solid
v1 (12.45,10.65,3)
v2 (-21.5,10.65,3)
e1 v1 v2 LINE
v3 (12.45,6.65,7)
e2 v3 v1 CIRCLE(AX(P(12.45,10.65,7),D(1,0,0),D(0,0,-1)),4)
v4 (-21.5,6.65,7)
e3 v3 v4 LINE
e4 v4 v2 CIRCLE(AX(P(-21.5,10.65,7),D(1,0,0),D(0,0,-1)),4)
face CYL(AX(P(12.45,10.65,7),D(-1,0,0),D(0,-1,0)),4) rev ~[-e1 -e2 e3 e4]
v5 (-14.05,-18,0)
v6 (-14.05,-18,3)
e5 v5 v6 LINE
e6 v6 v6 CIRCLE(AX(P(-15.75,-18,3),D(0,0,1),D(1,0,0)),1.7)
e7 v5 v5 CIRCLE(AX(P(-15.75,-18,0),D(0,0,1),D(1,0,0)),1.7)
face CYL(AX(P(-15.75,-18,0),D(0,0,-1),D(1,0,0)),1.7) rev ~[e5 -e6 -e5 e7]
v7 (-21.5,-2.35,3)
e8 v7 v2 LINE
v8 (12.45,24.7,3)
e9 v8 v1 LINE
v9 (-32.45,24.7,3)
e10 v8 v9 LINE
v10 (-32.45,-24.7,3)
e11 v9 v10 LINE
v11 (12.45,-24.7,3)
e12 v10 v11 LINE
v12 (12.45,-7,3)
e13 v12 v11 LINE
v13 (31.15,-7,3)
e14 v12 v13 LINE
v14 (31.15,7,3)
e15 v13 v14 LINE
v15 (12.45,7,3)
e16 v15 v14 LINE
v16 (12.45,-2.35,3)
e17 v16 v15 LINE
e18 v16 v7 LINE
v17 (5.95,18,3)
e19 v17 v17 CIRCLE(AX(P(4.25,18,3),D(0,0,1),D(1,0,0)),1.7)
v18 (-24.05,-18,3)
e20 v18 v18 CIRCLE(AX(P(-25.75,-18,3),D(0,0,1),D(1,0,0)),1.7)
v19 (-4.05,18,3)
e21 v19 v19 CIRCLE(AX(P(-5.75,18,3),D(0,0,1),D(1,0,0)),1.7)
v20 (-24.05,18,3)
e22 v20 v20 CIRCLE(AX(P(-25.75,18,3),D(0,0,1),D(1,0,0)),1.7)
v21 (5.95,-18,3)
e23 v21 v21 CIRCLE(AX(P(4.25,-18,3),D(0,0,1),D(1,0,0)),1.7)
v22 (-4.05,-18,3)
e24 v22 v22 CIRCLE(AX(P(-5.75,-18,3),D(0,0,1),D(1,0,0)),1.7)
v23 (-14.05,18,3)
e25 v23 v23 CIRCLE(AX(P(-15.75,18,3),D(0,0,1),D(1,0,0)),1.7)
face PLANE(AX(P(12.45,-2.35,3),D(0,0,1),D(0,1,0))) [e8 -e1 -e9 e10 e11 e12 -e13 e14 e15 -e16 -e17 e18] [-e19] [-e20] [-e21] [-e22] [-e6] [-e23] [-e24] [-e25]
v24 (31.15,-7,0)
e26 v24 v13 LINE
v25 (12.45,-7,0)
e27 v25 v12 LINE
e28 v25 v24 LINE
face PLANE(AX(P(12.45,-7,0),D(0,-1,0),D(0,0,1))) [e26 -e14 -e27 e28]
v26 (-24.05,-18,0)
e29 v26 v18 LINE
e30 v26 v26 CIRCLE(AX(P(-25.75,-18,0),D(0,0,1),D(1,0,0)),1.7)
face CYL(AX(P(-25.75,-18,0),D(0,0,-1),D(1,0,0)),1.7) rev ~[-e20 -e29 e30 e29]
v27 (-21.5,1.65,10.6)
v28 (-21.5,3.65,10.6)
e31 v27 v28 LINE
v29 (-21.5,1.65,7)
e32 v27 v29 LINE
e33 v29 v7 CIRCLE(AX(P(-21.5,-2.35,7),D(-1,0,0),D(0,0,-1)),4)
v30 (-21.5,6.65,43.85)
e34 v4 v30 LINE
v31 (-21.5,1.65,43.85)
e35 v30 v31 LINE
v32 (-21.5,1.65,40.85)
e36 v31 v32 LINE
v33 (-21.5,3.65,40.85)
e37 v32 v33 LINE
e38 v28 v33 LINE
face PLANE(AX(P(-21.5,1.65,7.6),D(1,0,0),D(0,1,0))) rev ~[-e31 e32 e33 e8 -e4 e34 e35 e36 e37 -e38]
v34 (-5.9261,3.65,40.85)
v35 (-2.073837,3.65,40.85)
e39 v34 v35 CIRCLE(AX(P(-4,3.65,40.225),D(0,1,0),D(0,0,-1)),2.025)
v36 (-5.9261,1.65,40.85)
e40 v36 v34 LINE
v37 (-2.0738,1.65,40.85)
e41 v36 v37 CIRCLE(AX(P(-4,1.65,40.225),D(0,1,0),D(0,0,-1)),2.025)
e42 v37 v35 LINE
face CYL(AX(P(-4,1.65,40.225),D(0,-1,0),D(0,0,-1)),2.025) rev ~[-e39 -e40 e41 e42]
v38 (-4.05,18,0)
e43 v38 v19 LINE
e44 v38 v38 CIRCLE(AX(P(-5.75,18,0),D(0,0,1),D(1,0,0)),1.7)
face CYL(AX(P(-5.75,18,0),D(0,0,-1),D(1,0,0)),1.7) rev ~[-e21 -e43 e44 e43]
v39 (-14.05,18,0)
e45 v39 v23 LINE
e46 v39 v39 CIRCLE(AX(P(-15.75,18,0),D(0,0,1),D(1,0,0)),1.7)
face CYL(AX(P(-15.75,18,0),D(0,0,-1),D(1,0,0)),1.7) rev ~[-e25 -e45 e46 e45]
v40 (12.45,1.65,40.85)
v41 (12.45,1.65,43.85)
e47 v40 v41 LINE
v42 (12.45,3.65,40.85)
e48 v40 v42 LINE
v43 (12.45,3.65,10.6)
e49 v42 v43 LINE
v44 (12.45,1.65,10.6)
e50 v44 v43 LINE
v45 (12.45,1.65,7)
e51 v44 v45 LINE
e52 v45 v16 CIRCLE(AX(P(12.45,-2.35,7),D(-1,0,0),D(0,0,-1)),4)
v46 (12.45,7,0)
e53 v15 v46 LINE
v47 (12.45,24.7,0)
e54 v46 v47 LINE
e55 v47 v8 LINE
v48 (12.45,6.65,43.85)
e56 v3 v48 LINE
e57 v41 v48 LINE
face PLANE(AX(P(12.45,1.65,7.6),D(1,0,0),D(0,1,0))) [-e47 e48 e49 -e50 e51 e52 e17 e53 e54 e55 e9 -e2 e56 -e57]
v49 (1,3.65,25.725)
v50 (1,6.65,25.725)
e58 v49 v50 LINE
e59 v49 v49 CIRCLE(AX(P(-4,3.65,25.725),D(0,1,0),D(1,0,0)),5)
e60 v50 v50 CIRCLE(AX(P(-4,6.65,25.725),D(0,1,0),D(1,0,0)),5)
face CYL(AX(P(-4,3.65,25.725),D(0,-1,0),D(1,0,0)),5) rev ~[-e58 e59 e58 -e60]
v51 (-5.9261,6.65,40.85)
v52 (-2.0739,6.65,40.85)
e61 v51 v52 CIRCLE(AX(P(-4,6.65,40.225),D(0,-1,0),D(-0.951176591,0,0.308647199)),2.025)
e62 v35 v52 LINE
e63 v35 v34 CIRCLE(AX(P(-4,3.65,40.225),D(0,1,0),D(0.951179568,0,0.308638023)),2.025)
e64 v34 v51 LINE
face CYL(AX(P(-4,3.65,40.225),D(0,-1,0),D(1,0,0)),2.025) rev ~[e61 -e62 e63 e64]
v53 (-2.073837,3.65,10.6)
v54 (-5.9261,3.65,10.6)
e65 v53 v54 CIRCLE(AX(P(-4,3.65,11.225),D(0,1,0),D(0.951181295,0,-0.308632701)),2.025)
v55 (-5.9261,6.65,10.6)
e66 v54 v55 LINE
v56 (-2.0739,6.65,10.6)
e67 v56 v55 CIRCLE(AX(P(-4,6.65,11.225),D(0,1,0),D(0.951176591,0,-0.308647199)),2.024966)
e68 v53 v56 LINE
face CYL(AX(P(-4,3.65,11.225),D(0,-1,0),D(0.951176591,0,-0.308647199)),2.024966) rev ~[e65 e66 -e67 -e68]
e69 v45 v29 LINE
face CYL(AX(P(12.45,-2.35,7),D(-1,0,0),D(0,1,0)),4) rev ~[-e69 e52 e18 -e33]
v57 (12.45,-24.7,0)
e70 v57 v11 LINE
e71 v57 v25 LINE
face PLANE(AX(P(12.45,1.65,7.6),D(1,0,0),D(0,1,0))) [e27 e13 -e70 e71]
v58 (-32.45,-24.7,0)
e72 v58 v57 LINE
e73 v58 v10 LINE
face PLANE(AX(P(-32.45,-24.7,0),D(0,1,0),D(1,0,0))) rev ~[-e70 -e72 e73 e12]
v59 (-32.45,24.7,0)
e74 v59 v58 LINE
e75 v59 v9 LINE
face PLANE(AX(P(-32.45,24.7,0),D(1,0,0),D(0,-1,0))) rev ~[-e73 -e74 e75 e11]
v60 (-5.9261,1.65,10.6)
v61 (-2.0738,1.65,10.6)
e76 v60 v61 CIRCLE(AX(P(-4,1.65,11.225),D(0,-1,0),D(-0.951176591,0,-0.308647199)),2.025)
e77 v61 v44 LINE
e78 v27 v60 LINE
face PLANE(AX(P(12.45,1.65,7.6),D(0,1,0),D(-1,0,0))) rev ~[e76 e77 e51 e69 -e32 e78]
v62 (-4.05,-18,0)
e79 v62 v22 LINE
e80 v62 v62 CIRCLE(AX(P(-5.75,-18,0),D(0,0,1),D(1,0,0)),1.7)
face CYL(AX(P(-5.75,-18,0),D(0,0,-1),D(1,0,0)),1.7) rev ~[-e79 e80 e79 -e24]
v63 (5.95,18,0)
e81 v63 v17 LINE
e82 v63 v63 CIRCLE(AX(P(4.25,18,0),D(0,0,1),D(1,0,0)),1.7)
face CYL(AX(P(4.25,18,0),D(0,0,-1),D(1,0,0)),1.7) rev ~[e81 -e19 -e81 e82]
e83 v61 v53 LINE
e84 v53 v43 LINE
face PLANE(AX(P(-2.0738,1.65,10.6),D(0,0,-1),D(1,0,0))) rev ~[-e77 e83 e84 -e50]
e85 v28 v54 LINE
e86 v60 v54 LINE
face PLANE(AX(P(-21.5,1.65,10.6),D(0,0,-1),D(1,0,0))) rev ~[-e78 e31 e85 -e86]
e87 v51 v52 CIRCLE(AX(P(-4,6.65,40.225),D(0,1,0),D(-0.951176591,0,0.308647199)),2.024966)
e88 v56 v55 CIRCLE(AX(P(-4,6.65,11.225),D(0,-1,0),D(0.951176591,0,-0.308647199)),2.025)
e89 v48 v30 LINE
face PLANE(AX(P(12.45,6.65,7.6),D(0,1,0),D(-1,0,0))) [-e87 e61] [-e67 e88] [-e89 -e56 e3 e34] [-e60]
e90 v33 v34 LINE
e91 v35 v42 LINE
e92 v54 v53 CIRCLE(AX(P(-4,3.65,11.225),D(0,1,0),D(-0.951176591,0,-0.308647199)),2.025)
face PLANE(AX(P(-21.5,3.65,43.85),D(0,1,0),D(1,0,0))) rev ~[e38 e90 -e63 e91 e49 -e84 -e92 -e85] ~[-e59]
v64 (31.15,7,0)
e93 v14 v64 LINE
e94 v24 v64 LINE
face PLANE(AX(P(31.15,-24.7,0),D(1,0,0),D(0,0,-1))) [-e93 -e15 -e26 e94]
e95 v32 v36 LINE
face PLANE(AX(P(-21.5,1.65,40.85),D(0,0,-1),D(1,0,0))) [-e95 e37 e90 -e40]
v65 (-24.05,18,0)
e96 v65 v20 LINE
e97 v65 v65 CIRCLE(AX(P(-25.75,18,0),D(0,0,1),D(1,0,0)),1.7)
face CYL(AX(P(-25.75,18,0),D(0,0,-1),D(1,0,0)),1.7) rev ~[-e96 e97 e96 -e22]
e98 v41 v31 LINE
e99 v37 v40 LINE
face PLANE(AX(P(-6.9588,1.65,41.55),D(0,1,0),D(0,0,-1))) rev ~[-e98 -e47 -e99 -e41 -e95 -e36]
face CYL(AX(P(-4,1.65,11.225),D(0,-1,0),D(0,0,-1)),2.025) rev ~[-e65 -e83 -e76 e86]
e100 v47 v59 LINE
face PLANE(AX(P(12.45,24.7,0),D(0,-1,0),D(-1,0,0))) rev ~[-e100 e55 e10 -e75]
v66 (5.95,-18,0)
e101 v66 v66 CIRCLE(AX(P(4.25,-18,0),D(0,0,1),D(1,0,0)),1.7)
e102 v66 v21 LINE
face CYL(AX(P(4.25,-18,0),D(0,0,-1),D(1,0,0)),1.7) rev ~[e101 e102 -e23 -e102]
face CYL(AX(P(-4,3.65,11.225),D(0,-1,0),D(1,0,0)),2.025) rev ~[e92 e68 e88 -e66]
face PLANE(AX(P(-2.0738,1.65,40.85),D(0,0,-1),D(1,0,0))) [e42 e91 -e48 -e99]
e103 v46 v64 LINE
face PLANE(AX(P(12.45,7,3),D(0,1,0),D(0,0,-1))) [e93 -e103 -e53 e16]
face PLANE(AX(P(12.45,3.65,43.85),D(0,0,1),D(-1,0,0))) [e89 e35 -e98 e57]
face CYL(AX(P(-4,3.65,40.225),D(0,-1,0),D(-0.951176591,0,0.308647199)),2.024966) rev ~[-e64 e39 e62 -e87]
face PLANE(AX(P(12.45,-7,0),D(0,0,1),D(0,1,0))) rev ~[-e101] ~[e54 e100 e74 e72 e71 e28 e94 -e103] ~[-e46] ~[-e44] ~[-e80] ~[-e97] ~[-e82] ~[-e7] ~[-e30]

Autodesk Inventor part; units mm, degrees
ref_plane "YZ Plane" through (0, 0, 0) normal (1, 0, 0) x (0, 1, 0)
ref_plane "XZ Plane" through (0, 0, 0) normal (0, 1, 0) x (-1, 0, 0)
ref_plane "Work Plane1" through (0, 0, 0) normal (0, 0, 1) x (1, 0, 0)
sketch "Sketch1" plane through (0, 0, 0) normal (0, 0, 1) x (1, 0, 0)
  circle A0 centre (-25.75, 18) radius 1.7 projected
  circle A1 centre (4.25, 18) radius 1.7 projected
  circle A2 centre (-15.75, 18) radius 1.7 projected
  circle A3 centre (-5.75, 18) radius 1.7 projected
  line L0 (-32.45, 24.7) -> (12.45, 24.7) construction
  line L1 (-32.45, 13) -> (-32.45, 24.7) construction
  line L2 (-12.45, 13) -> (-32.45, 13) construction
  line L3 (1.25, 8.4548) -> (-12.45, 13) construction
  arc A4 (5.4986, 7.8696) -> (1.25, 8.4548) centre (2.25, 0) ccw construction
  line L4 (12.45, 5) -> (5.4986, 7.8696) construction
  line L5 (12.45, 24.7) -> (12.45, 7) construction
  circle A5 centre (-25.75, -18) radius 1.7 projected
  circle A6 centre (-15.75, -18) radius 1.7 projected
  circle A7 centre (4.25, -18) radius 1.7 projected
  line L6 (12.45, -24.7) -> (-32.45, -24.7) construction
  line L7 (12.45, -7) -> (12.45, -24.7) construction
  line L8 (5.4986, -7.8696) -> (12.45, -5) construction
  arc A8 (1.25, -8.4548) -> (5.4986, -7.8696) centre (2.25, 0) ccw construction
  line L9 (-12.45, -13) -> (1.25, -8.4548) construction
  line L10 (-12.45, -13) -> (-32.45, -13) construction
  line L11 (-32.45, -24.7) -> (-32.45, -13) construction
  circle A9 centre (-5.75, -18) radius 1.7 projected
  line L12 (12.45, 24.7) -> (-32.45, 24.7)
  line L13 (-32.45, 24.7) -> (-32.45, -24.7)
  line L14 (-32.45, -24.7) -> (12.45, -24.7)
  line L15 (12.45, -24.7) -> (12.45, 24.7)
  line L16 (12.45, 5) -> (31.15, 5) projected
  line L17 (31.15, 5) -> (31.15, 7) projected
  line L18 (12.45, 7) -> (31.15, 7) projected
  line L19 (12.45, -7) -> (31.15, -7) projected
  line L20 (31.15, -7) -> (31.15, -5) projected
  line L21 (12.45, -5) -> (31.15, -5) projected
  point P0 (0, 0)
extrude "Extrusion1" add sketch "Sketch1" along normal blind 3 contours L15 L14 L13 L12
ref_plane "Work Plane2" through (-6.9588, 1.65, 41.55) normal (0, 1, 0) x (0, 0, -1)
ref_plane "Work Plane3" through (12.46, 3.65, 25.725) normal (0, 1, 0) x (0, 0, -1)
sketch "Sketch2" plane through (-6.9588, 1.65, 41.55) normal (0, 1, 0) x (0, 0, -1)
  arc A0 (29.75, -19.4088) -> (30.75, -18.4088) centre (29.75, -18.4088) ccw construction
  line L0 (30.75, -18.4088) -> (30.75, -6.9173) construction
  arc A1 (30.75, -6.9173) -> (29.8938, -5.9277) centre (29.75, -6.9173) ccw construction
  arc A2 (29.8938, 0.01) -> (29.8938, -5.9277) centre (30.325, -2.9588) ccw construction
  arc A3 (29.8938, 0.01) -> (30.75, 0.9996) centre (29.75, 0.9996) ccw construction
  line L1 (30.75, 0.9996) -> (30.75, 13.5412) construction
  arc A4 (30.75, 13.5412) -> (29.75, 14.5412) centre (29.75, 13.5412) ccw construction
  line L2 (1.9, 14.5412) -> (29.75, 14.5412) construction
  arc A5 (1.9, 14.5412) -> (0.9, 13.5412) centre (1.9, 13.5412) ccw construction
  line L3 (0.9, 13.5412) -> (0.9, 0.9996) construction
  arc A6 (0.9, 0.9996) -> (1.7563, 0.01) centre (1.9, 0.9996) ccw construction
  arc A7 (1.7563, -5.9277) -> (1.7563, 0.01) centre (1.325, -2.9588) ccw construction
  arc A8 (1.7563, -5.9277) -> (0.9, -6.9173) centre (1.9, -6.9173) ccw construction
  line L4 (0.9, -6.9173) -> (0.9, -18.4088) construction
  arc A9 (0.9, -18.4088) -> (1.9, -19.4088) centre (1.9, -18.4088) ccw construction
  line L5 (29.75, -19.4088) -> (1.9, -19.4088) construction
  line L6 (27.025, -11.9588) -> (27.025, -5.2194) construction
  line L7 (4.625, -11.9588) -> (27.025, -11.9588) construction
  line L8 (4.625, -5.2194) -> (4.625, -11.9588) construction
  arc A10 (4.625, -5.2194) -> (4.625, -0.6983) centre (1.325, -2.9588) ccw construction
  line L9 (4.625, -0.6983) -> (4.625, 11.8412) construction
  line L10 (27.025, 11.8412) -> (4.625, 11.8412) construction
  line L11 (27.025, 11.8412) -> (27.025, -0.6983) construction
  arc A11 (27.025, -0.6983) -> (27.025, -5.2194) centre (30.325, -2.9588) ccw construction
  arc A12 (33.55, -6.9286) -> (32.55, -5.9286) centre (32.55, -6.9286) ccw construction
  line L12 (32.55, -5.9286) -> (30.75, -5.9286) construction
  arc A13 (29.8938, -5.9277) -> (30.75, -5.9286) centre (30.325, -2.9588) ccw construction
  arc A14 (30.75, -6.9173) -> (29.8938, -5.9277) centre (29.75, -6.9173) ccw construction
  line L13 (30.75, -18.4088) -> (30.75, -6.9173) construction
  arc A15 (29.75, -19.4088) -> (30.75, -18.4088) centre (29.75, -18.4088) ccw construction
  line L14 (32.55, -19.4088) -> (29.75, -19.4088) construction
  arc A16 (32.55, -19.4088) -> (33.55, -18.4088) centre (32.55, -18.4088) ccw construction
  line L15 (33.55, -6.9286) -> (33.55, -18.4088) construction
  arc A17 (32.55, 0.0109) -> (33.55, 1.0109) centre (32.55, 1.0109) ccw construction
  line L16 (33.55, 13.5412) -> (33.55, 1.0109) construction
  arc A18 (33.55, 13.5412) -> (32.55, 14.5412) centre (32.55, 13.5412) ccw construction
  line L17 (29.75, 14.5412) -> (32.55, 14.5412) construction
  arc A19 (30.75, 13.5412) -> (29.75, 14.5412) centre (29.75, 13.5412) ccw construction
  line L18 (30.75, 0.9996) -> (30.75, 13.5412) construction
  arc A20 (29.8938, 0.01) -> (30.75, 0.9996) centre (29.75, 0.9996) ccw construction
  arc A21 (30.75, 0.0109) -> (29.8938, 0.01) centre (30.325, -2.9588) ccw construction
  line L19 (30.75, 0.0109) -> (32.55, 0.0109) construction
  arc A22 (-1.9, 1.0109) -> (-0.9, 0.0109) centre (-0.9, 1.0109) ccw construction
  line L20 (-0.9, 0.0109) -> (0.9, 0.0109) construction
  arc A23 (1.7563, 0.01) -> (0.9, 0.0109) centre (1.325, -2.9588) ccw construction
  arc A24 (0.9, 0.9996) -> (1.7563, 0.01) centre (1.9, 0.9996) ccw construction
  line L21 (0.9, 13.5412) -> (0.9, 0.9996) construction
  arc A25 (1.9, 14.5412) -> (0.9, 13.5412) centre (1.9, 13.5412) ccw construction
  line L22 (-0.9, 14.5412) -> (1.9, 14.5412) construction
  arc A26 (-0.9, 14.5412) -> (-1.9, 13.5412) centre (-0.9, 13.5412) ccw construction
  line L23 (-1.9, 1.0109) -> (-1.9, 13.5412) construction
  arc A27 (-0.9, -5.9286) -> (-1.9, -6.9286) centre (-0.9, -6.9286) ccw construction
  line L24 (-1.9, -18.4088) -> (-1.9, -6.9286) construction
  arc A28 (-1.9, -18.4088) -> (-0.9, -19.4088) centre (-0.9, -18.4088) ccw construction
  line L25 (1.9, -19.4088) -> (-0.9, -19.4088) construction
  arc A29 (0.9, -18.4088) -> (1.9, -19.4088) centre (1.9, -18.4088) ccw construction
  line L26 (0.9, -6.9173) -> (0.9, -18.4088) construction
  arc A30 (1.7563, -5.9277) -> (0.9, -6.9173) centre (1.9, -6.9173) ccw construction
  arc A31 (0.9, -5.9286) -> (1.7563, -5.9277) centre (1.325, -2.9588) ccw construction
  line L27 (0.9, -5.9286) -> (-0.9, -5.9286) construction
  line L28 (-1.9, -6.9286) -> (-1.9, 1.0109) construction
  arc A32 (-0.9, -5.9286) -> (-1.9, -6.9286) centre (-0.9, -6.9286) ccw construction
  line L29 (0.9, -5.9286) -> (-0.9, -5.9286) construction
  arc A33 (0.9, -5.9286) -> (0.9, 0.0109) centre (1.325, -2.9588) ccw construction
  line L30 (-0.9, 0.0109) -> (0.9, 0.0109) construction
  arc A34 (-1.9, 1.0109) -> (-0.9, 0.0109) centre (-0.9, 1.0109) ccw construction
  circle A35 centre (1.325, -2.9588) radius 1.725 construction
  line L31 (33.55, 1.0109) -> (33.55, -6.9286) construction
  arc A36 (32.55, 0.0109) -> (33.55, 1.0109) centre (32.55, 1.0109) ccw construction
  line L32 (30.75, 0.0109) -> (32.55, 0.0109) construction
  arc A37 (30.75, 0.0109) -> (30.75, -5.9286) centre (30.325, -2.9588) ccw construction
  line L33 (32.55, -5.9286) -> (30.75, -5.9286) construction
  arc A38 (33.55, -6.9286) -> (32.55, -5.9286) centre (32.55, -6.9286) ccw construction
  circle A39 centre (30.325, -2.9588) radius 1.725 construction
  line L34 (-2.3, 14.5412) -> (0.7, 14.5412)
  line L35 (0.7, -19.4088) -> (-2.3, -19.4088)
  line L36 (-2.3, -19.4088) -> (-2.3, 14.5412)
  line L37 (15.825, 14.5412) -> (15.825, -19.4088) construction
  circle A40 centre (1.325, -2.9588) radius 2.025
  line L38 (0.7, 14.5412) -> (0.7, -1.0327)
  line L39 (0.7, -4.885) -> (0.7, -19.4088)
  arc A41 (30.75, 13.5412) -> (29.75, 14.5412) centre (29.75, 13.5412) ccw construction
  line L40 (30.75, 13.5412) -> (30.75, 0.9996) construction
  arc A42 (29.8938, 0.01) -> (30.75, 0.9996) centre (29.75, 0.9996) ccw construction
  arc A43 (29.8938, 0.01) -> (29.8938, -5.9277) centre (30.325, -2.9588) ccw construction
  arc A44 (30.75, -6.9173) -> (29.8938, -5.9277) centre (29.75, -6.9173) ccw construction
  line L41 (30.75, -6.9173) -> (30.75, -18.4088) construction
  arc A45 (29.75, -19.4088) -> (30.75, -18.4088) centre (29.75, -18.4088) ccw construction
  line L42 (27.025, -5.2194) -> (27.025, -11.9588) construction
  arc A46 (27.025, -0.6983) -> (27.025, -5.2194) centre (30.325, -2.9588) ccw construction
  line L43 (27.025, -0.6983) -> (27.025, 11.8412) construction
  arc A47 (32.55, 0.0109) -> (33.55, 1.0109) centre (32.55, 1.0109) ccw construction
  line L44 (32.55, 0.0109) -> (30.75, 0.0109) construction
  arc A48 (30.75, 0.0109) -> (29.8938, 0.01) centre (30.325, -2.9588) ccw construction
  arc A49 (29.8938, 0.01) -> (30.75, 0.9996) centre (29.75, 0.9996) ccw construction
  line L45 (30.75, 13.5412) -> (30.75, 0.9996) construction
  arc A50 (30.75, 13.5412) -> (29.75, 14.5412) centre (29.75, 13.5412) ccw construction
  line L46 (32.55, 14.5412) -> (29.75, 14.5412) construction
  arc A51 (33.55, 13.5412) -> (32.55, 14.5412) centre (32.55, 13.5412) ccw construction
  line L47 (33.55, 1.0109) -> (33.55, 13.5412) construction
  arc A52 (33.55, -6.9286) -> (32.55, -5.9286) centre (32.55, -6.9286) ccw construction
  line L48 (33.55, -18.4088) -> (33.55, -6.9286) construction
  arc A53 (32.55, -19.4088) -> (33.55, -18.4088) centre (32.55, -18.4088) ccw construction
  line L49 (29.75, -19.4088) -> (32.55, -19.4088) construction
  arc A54 (29.75, -19.4088) -> (30.75, -18.4088) centre (29.75, -18.4088) ccw construction
  line L50 (30.75, -6.9173) -> (30.75, -18.4088) construction
  arc A55 (30.75, -6.9173) -> (29.8938, -5.9277) centre (29.75, -6.9173) ccw construction
  arc A56 (29.8938, -5.9277) -> (30.75, -5.9286) centre (30.325, -2.9588) ccw construction
  line L51 (30.75, -5.9286) -> (32.55, -5.9286) construction
  line L52 (33.55, -6.9286) -> (33.55, 1.0109) construction
  arc A57 (33.55, -6.9286) -> (32.55, -5.9286) centre (32.55, -6.9286) ccw construction
  line L53 (30.75, -5.9286) -> (32.55, -5.9286) construction
  arc A58 (30.75, 0.0109) -> (30.75, -5.9286) centre (30.325, -2.9588) ccw construction
  line L54 (32.55, 0.0109) -> (30.75, 0.0109) construction
  arc A59 (32.55, 0.0109) -> (33.55, 1.0109) centre (32.55, 1.0109) ccw construction
  circle A60 centre (30.325, -2.9588) radius 1.725 construction
  line L55 (33.95, 14.5412) -> (30.95, 14.5412)
  line L56 (30.95, -19.4088) -> (33.95, -19.4088)
  line L57 (33.95, -19.4088) -> (33.95, 14.5412)
  circle A61 centre (30.325, -2.9588) radius 2.025
  line L58 (30.95, 14.5412) -> (30.95, -1.0327)
  line L59 (30.95, -4.885) -> (30.95, -19.4088)
extrude "Extrusion2" add sketch "Sketch2" along normal up to surface (2 mm away) contours L34 L38 A40 L39 L35 L36 | L57 L56 L59 A61 L58 L55
sketch "Sketch3" plane through (-21.5, 3.65, 43.85) normal (0, 1, 0) x (1, 0, 0)
  line L0 (33.95, 0) -> (0, 0) projected
  line L1 (33.95, 36.25) -> (33.95, 33.25) projected
  line L2 (0, 0) -> (33.95, 0)
  line L3 (33.95, 0) -> (33.95, 36.25)
  line L4 (33.95, 36.25) -> (0, 36.25)
  line L5 (0, 36.25) -> (0, 0)
  arc A0 (15.5739, 3) -> (19.4261, 3) centre (17.5, 3.625) ccw projected
  arc A1 (19.4261, 33.25) -> (15.5739, 33.25) centre (17.5, 32.625) ccw projected
  circle A2 centre (17.5, 3.625) radius 2.025
  circle A3 centre (17.5, 32.625) radius 2.025
  circle A4 centre (17.5, 18.125) radius 5
  point P0 (21.5, 43.85)
  point P1 (33.95, 0)
  point P2 (33.95, 33.25)
  point P3 (19.4261, 33.25)
  point P4 (19.4261, 3)
  point P5 (0, 18.125)
  dimension "d15" = 10
extrude "Extrusion3" add sketch "Sketch3" along normal blind 3
sketch "Sketch4" plane through (12.45, 1.65, 7.6) normal (0, 0, -1) x (-1, 0, 0)
  line L0 (0, 0) -> (0, 5) projected
  line L1 (0, 0) -> (33.95, 0) projected
  line L2 (33.95, 0) -> (33.95, 5) projected
  line L3 (0, 5) -> (33.95, 5) projected
  point P0 (12.45, -1.65)
extrude "Extrusion4" add sketch "Sketch4" along normal up to surface (4.6 mm away)
fillet "Fillet1" radius 4 2 edges at (-4.525, 1.65, 3) (-4.525, 6.65, 3)
sketch "Sketch5" plane through (12.45, -24.7, 0) normal (1, 0, 0) x (0, 0, -1)
  line L0 (0.1, 19.7) -> (8.2, 19.7) projected
  line L1 (0.1, 17.7) -> (0.1, 19.7) projected
  line L2 (10.2, 17.7) -> (0.1, 17.7) projected
  line L3 (10.2, 31.7) -> (10.2, 17.7) projected
  line L4 (0.1, 31.7) -> (10.2, 31.7) projected
  line L5 (0.1, 29.7) -> (0.1, 31.7) projected
  line L6 (8.2, 29.7) -> (0.1, 29.7) projected
  line L7 (8.2, 19.7) -> (8.2, 29.7) projected
  line L8 (-43.85, 26.35) -> (-43.85, 31.35) projected
  line L9 (-43.85, 26.35) -> (-40.85, 26.35) projected
  line L10 (-40.85, 26.35) -> (-40.85, 28.35) projected
  line L11 (-40.85, 28.35) -> (-10.6, 28.35) projected
  line L12 (-10.6, 26.35) -> (-10.6, 28.35) projected
  line L13 (-10.6, 26.35) -> (-7, 26.35) projected
  arc A0 (-3, 22.35) -> (-7, 26.35) centre (-7, 22.35) ccw projected
  line L14 (-3, 0) -> (-3, 22.35) projected
  line L15 (0, 0) -> (-3, 0) projected
  line L16 (0, 0) -> (0, 49.4) projected
  line L17 (0, 49.4) -> (-3, 49.4) projected
  line L18 (-3, 35.35) -> (-3, 49.4) projected
  arc A1 (-7, 31.35) -> (-3, 35.35) centre (-7, 35.35) ccw projected
  line L19 (-43.85, 31.35) -> (-7, 31.35) projected
  line L20 (-3, 22.35) -> (-3, 35.35) projected
  line L21 (-3, 31.7) -> (0, 31.7)
  line L22 (0, 31.7) -> (0, 17.7)
  line L23 (0, 17.7) -> (-3, 17.7)
  line L24 (-3, 17.7) -> (-3, 31.7)
  line L25 (0, 0) -> (0, 49.4) projected
  point P0 (0, 24.7)
  point P1 (0, 31.7)
ref_plane "Work Plane4" through (31.15, -26.2379, 8.1621) normal (1, 0, 0) x (0, 0.9775164, 0.2108593)
extrude "Extrusion5" add sketch "Sketch5" along normal up to surface (18.7 mm away) contours L21 L16 L23 L14 L20
properties part number "body cover"
